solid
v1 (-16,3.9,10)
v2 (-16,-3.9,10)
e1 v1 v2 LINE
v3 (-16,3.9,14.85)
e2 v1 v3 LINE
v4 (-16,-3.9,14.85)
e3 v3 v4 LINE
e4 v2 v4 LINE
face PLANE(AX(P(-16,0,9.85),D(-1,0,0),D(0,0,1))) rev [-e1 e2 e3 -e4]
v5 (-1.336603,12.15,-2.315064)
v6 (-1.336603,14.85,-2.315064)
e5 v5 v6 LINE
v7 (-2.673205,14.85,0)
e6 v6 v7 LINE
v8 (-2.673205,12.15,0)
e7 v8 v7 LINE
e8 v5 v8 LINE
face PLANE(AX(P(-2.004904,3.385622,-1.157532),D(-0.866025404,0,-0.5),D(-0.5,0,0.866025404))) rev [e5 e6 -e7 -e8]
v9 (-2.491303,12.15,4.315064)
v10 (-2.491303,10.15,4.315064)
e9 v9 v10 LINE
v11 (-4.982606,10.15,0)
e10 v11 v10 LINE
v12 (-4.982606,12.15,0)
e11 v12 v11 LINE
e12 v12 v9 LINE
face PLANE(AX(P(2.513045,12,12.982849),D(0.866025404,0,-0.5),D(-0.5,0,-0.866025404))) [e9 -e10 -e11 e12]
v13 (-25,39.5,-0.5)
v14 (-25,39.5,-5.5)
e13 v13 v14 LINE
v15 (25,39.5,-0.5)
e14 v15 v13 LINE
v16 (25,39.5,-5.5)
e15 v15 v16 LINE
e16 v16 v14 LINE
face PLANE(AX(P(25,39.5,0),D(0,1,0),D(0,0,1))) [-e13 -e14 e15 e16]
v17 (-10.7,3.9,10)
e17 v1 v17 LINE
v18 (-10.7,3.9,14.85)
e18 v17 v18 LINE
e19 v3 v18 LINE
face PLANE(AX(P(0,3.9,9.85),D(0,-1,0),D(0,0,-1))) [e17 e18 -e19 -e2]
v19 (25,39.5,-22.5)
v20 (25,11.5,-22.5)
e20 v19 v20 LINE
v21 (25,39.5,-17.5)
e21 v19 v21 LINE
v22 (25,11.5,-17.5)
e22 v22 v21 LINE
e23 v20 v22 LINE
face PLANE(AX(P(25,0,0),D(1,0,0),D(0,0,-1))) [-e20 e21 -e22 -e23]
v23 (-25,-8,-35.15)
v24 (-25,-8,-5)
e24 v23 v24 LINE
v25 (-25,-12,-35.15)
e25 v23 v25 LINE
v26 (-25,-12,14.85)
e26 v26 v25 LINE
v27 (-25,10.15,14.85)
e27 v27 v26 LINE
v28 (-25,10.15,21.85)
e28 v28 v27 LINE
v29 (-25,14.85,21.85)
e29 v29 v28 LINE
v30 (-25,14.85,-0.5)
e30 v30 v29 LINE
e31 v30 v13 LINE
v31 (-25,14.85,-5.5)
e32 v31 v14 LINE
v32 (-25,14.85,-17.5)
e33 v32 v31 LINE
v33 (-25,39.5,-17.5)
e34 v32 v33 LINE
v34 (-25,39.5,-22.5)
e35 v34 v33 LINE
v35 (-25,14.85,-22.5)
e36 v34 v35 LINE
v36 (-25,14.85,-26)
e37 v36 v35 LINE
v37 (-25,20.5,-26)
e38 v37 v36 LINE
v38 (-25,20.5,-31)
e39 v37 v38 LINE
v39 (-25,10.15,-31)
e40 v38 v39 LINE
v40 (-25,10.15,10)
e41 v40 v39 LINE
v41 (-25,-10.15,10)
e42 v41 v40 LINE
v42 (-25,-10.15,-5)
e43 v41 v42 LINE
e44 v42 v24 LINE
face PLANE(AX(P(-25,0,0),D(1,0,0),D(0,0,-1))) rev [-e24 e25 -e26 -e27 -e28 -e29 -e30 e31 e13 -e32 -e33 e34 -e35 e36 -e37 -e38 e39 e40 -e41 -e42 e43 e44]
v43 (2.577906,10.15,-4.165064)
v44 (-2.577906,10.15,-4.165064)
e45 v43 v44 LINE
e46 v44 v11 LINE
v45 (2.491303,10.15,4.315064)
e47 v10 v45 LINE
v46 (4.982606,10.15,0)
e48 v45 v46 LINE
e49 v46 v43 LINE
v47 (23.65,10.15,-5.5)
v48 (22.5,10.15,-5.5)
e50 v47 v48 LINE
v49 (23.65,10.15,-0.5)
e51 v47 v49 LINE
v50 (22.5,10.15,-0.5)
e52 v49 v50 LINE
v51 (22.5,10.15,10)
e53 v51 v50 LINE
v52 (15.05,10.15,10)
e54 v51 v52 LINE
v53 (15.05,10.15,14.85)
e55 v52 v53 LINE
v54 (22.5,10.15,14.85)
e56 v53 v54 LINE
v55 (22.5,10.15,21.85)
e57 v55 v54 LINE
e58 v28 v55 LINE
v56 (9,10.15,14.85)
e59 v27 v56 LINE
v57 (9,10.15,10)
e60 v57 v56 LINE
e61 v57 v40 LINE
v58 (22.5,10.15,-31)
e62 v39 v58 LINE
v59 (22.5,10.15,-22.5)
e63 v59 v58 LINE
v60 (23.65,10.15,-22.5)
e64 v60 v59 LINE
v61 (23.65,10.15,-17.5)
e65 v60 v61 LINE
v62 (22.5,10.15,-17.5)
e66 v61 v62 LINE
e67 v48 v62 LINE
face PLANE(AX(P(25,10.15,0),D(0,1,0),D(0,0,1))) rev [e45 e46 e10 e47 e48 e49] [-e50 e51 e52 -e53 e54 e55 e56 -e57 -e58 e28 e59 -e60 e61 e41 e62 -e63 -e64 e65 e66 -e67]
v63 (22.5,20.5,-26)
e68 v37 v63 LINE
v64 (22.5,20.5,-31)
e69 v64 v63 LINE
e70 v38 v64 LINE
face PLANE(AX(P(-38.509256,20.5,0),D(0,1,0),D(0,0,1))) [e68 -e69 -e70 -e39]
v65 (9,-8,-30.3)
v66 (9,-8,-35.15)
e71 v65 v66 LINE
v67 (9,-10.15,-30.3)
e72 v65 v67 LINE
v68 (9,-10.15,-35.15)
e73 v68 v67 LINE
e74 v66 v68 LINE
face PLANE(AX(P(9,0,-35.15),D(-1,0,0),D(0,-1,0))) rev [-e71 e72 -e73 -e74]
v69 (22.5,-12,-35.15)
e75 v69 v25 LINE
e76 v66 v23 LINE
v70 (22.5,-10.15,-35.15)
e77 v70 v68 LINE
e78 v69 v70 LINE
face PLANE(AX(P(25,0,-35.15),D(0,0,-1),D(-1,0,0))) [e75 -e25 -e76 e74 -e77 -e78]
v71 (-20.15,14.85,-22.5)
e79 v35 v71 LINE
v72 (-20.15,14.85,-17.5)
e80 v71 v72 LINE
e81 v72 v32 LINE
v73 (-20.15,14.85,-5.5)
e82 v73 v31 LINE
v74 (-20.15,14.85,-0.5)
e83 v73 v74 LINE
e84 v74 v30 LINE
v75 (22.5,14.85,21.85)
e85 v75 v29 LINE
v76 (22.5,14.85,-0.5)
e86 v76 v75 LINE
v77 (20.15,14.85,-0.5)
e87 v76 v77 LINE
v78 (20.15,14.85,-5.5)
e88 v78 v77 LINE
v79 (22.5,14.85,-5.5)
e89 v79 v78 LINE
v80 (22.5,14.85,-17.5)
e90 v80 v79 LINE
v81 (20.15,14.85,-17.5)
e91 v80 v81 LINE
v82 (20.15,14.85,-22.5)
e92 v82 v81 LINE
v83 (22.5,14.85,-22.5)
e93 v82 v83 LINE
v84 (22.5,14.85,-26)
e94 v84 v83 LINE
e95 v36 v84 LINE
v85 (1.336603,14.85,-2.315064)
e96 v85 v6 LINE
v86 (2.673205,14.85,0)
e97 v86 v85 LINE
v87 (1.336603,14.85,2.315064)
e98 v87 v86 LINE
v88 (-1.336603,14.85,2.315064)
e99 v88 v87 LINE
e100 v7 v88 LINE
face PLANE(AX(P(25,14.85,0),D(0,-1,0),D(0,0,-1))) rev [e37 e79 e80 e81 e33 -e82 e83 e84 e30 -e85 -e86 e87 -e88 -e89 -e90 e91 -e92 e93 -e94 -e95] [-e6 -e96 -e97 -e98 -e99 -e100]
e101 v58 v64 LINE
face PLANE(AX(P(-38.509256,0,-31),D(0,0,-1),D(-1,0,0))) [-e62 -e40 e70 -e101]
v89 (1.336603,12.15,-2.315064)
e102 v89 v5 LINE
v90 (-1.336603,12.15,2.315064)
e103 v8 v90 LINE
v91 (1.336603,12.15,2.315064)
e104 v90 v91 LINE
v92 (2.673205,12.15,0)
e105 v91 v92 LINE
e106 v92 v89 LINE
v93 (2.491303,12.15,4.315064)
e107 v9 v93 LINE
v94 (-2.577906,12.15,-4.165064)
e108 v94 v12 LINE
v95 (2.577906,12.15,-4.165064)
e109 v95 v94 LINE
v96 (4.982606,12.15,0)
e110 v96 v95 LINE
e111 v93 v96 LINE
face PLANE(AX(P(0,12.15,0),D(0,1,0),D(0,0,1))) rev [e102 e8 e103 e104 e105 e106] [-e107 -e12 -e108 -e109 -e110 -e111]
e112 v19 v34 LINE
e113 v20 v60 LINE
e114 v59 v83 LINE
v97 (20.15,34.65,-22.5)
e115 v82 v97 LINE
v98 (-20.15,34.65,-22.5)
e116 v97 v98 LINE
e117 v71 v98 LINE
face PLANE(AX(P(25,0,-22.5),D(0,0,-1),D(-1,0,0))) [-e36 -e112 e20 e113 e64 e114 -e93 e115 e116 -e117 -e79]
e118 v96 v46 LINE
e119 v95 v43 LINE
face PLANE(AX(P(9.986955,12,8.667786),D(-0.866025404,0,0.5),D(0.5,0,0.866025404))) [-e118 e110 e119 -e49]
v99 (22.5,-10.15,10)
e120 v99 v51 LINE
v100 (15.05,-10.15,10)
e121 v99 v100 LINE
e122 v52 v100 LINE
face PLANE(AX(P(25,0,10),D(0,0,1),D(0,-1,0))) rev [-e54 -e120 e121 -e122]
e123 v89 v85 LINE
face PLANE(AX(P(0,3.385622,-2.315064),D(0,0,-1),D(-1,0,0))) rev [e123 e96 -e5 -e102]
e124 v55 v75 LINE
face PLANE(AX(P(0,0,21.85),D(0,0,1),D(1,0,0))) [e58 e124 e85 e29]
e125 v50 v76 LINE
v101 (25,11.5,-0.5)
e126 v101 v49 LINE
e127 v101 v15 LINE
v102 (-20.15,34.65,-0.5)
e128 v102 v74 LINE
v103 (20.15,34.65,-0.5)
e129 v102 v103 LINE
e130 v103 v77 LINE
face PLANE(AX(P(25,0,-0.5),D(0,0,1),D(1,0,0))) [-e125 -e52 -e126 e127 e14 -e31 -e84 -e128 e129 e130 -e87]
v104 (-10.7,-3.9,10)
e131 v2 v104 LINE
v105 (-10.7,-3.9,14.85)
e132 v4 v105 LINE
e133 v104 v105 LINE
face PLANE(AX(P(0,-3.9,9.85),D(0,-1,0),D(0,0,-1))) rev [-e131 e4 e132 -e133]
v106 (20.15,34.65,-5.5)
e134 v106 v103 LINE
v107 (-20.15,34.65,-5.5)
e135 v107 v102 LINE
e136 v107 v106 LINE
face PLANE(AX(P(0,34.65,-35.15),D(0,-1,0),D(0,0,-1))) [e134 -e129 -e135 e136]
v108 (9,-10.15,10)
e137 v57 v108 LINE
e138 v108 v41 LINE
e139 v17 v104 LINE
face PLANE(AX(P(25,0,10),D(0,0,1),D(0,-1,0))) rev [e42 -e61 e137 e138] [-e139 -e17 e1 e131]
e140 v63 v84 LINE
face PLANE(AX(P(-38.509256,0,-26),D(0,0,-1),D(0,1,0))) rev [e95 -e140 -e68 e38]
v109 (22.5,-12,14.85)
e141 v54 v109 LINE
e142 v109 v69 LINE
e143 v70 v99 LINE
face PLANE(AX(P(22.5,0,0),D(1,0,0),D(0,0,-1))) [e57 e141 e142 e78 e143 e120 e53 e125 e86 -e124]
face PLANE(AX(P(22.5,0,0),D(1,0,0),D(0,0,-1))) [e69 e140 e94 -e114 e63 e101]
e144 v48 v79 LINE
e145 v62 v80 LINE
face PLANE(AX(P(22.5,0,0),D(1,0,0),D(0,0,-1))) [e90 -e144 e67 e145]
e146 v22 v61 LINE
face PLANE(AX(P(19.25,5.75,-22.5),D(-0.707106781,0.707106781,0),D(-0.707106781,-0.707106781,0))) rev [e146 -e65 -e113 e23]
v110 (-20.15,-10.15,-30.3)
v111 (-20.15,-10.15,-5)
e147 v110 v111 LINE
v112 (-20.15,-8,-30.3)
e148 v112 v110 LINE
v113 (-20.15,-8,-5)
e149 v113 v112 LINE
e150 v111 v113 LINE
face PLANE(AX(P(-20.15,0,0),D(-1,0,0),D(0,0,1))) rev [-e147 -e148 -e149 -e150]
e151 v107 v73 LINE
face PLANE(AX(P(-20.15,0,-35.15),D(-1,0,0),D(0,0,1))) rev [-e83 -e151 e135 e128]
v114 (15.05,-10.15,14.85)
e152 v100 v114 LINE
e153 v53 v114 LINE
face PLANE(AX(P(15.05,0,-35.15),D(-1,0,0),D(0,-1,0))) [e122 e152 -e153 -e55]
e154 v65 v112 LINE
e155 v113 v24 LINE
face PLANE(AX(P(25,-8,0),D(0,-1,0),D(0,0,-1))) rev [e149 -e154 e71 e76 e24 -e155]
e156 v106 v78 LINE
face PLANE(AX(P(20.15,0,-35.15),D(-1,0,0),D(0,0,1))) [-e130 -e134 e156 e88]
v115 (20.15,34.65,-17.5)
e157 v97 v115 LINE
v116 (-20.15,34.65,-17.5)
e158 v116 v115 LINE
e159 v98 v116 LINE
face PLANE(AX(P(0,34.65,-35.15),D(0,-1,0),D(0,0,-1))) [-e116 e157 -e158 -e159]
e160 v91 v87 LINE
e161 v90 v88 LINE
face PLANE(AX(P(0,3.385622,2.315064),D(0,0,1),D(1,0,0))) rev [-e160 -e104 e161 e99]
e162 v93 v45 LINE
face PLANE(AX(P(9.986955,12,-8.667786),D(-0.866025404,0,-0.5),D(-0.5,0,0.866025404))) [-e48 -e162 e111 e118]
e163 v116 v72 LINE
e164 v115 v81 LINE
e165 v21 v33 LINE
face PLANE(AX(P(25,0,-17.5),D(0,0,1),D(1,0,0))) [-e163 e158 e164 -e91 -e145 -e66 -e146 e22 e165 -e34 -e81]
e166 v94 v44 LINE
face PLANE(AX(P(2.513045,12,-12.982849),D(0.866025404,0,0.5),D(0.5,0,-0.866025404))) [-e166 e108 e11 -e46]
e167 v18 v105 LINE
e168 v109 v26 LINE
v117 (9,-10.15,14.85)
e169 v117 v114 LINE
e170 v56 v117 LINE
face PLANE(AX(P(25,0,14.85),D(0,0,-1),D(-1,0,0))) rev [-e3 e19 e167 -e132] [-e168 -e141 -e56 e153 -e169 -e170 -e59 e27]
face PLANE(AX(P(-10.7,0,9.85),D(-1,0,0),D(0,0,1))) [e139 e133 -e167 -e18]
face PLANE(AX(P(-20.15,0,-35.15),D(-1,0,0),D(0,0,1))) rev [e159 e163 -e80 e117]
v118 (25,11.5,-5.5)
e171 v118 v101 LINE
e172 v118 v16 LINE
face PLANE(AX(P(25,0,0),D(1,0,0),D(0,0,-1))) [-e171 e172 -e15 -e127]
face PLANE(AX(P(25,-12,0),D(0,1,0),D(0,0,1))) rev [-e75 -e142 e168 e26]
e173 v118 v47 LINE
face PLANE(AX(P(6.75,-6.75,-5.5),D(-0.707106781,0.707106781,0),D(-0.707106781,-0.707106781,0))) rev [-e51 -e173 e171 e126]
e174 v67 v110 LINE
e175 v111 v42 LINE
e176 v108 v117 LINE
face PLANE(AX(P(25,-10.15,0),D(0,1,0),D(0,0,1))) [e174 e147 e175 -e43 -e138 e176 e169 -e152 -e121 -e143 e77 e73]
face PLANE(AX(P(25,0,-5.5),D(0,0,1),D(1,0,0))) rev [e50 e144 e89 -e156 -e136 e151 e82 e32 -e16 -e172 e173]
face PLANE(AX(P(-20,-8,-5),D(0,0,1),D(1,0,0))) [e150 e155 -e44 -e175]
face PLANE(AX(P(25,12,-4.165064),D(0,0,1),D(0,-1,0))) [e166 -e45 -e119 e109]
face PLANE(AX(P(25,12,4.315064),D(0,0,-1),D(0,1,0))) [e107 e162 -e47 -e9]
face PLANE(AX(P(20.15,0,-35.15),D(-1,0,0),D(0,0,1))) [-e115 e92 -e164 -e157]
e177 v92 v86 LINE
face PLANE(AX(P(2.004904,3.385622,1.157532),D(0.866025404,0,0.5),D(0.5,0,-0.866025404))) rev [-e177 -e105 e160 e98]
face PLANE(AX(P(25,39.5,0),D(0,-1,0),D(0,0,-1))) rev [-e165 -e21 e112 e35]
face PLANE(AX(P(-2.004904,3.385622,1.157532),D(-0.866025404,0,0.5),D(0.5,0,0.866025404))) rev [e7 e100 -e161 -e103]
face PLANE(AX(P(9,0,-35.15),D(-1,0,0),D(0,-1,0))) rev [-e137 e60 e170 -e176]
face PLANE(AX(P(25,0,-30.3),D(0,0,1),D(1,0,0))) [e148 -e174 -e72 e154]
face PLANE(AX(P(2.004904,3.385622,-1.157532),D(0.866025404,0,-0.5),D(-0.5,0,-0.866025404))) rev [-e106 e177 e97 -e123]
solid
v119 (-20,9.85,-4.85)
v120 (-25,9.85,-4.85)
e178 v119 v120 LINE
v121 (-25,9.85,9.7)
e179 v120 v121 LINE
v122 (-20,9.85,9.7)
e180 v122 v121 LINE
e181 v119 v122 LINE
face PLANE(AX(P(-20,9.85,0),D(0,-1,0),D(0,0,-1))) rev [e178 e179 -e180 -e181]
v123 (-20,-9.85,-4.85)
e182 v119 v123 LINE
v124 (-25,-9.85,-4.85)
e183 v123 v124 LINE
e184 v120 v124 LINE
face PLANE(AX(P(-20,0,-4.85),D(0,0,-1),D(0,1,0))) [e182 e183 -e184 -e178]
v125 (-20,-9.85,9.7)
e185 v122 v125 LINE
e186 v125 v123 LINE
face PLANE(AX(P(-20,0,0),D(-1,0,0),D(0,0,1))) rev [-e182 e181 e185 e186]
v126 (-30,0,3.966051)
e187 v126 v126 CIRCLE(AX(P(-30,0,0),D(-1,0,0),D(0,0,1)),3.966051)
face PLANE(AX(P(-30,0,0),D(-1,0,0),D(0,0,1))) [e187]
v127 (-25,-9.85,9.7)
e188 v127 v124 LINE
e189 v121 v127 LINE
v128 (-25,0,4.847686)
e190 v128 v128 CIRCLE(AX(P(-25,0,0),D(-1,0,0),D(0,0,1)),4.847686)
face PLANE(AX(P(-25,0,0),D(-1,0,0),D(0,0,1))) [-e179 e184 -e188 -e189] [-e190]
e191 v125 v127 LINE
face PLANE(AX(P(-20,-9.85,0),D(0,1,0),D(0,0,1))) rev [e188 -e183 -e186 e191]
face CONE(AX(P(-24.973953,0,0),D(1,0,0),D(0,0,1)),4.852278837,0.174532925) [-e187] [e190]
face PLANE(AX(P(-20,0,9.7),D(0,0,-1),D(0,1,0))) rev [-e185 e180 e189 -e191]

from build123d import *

# Parameters (mm, degrees)
MAIN_BODY_EXTRUDE_DEPTH            = 25
SKETCH2_W                          = 40
SKETCH2_H                          = 19.5
SKETCH2_W_2                        = 5.75
SKETCH2_H_2                        = 20
CUT_OUT_FOR_SERVO_AND_CAMERA_DEPTH = 69.448886039
CUT_EXTRUDE2_DEPTH                 = 5
CUT_EXTRUDE3_START                 = -5
CUT_EXTRUDE3_DEPTH                 = 2
MOVE_FACE1_BY                      = 2
SKETCH6_W                          = 5
SKETCH6_H                          = 7.5
CABLE_CLEARANCE_DEPTH              = 5
SKETCH7_W                          = 5
SKETCH7_H                          = 5.5
BOSS_EXTRUDE1_DEPTH                = 50
SKETCH8_R                          = 5
BOSS_EXTRUDE2_DEPTH                = 5
SKETCH8_3_R                        = 5
BOSS_EXTRUDE3_DEPTH                = 5
BOSS_EXTRUDE3_TAPER                = 10
SKETCH9_W                          = 25.15
SKETCH9_H                          = 2
BOSS_EXTRUDE4_DEPTH                = 5
INSET_THE_WALL_DEPTH               = 2.5
FRAME_CHAMFER_1_DEPTH              = 5
FRAME_START                        = -17
FRAME_CHAMFER_2_DEPTH              = 5
SKETCH12_W                         = 47.5
SKETCH12_H                         = 5
BOSS_EXTRUDE7_DEPTH                = 7
OFFSET_START                       = -5
OFFSET_FOR_3D_PRINT_OUTLINE_W      = 13
OFFSET_FOR_3D_PRINT_OUTLINE_H      = 0.15
OFFSET_FOR_3D_PRINT_DEPTH          = 14.85
OFFSET_FOR_3D_PRINT_2_OUTLINE_W    = 13
OFFSET_FOR_3D_PRINT_2_OUTLINE_H    = 19.7
OFFSET_FOR_3D_PRINT_2_DEPTH        = 0.15
OFFSET_START_2                     = 9.7
OFFSET_FOR_3D_PRINT_3_OUTLINE_W    = 13
OFFSET_FOR_3D_PRINT_3_OUTLINE_H    = 19.7
OFFSET_FOR_3D_PRINT_3_DEPTH        = 0.15
OFFSET_START_3                     = -10.15
OFFSET_FOR_3D_PRINT_5_DEPTH        = 20.3
OFFSET_START_4                     = 14.85
OFFSET_FOR_3D_PRINT_6_DEPTH        = 19.8
OFFSET_START_5                     = 10
OFFSET_FOR_3D_PRINT_7_DEPTH        = 0.15
OFFSET_START_6                     = -3.9
OFFSET_FOR_3D_PRINT_8_OUTLINE_W    = 5.3
OFFSET_FOR_3D_PRINT_8_OUTLINE_H    = 4.85
OFFSET_FOR_3D_PRINT_8_DEPTH        = 7.8
OFFSET_START_7                     = 10.15
OFFSET_FOR_3D_PRINT_9_DEPTH        = 2
OFFSET_START_8                     = 12.15
OFFSET_FOR_3D_PRINT_10_DEPTH       = 2.7


with BuildPart() as part:
    # Sketch1 → Main Body Extrude (new, symmetric)
    with BuildSketch(Plane(origin=(0, 0, 0), x_dir=(0, 0, -1), z_dir=(1, 0, 0))):
        Polygon((-14.85, -12), (35.15, -12), (35.15, -8), (30.15, -8), (30.15, -10), (-9.85, -10), (-9.85, 10), (22.5, 10), (22.5, 39.5), (17.5, 39.5), (17.5, 15), (5.5, 15), (5.5, 39.5), (0.5, 39.5), (0.5, 15), (-14.85, 15), align=None)
    extrude(amount=MAIN_BODY_EXTRUDE_DEPTH, both=True)

    # Sketch2 → Cut out for Servo and camera (cut, through all)
    with BuildSketch(Plane.XY.offset(14.85)):
        with Locations((0, 24.75)):
            Rectangle(SKETCH2_W, SKETCH2_H)
        with Locations((12.025, 0)):
            Rectangle(SKETCH2_W_2, SKETCH2_H_2)
    extrude(amount=-CUT_OUT_FOR_SERVO_AND_CAMERA_DEPTH, mode=Mode.SUBTRACT)

    # Sketch3 → Cut-Extrude2 (cut)
    with BuildSketch(Plane(origin=(0, 15, 0), x_dir=(1, 0, 0), z_dir=(0, 1, 0))):
        Polygon((2.5, 0), (1.25, 2.165063509), (-1.25, 2.165063509), (-2.5, 0), (-1.25, -2.165063509), (1.25, -2.165063509), align=None)
    extrude(amount=-CUT_EXTRUDE2_DEPTH, mode=Mode.SUBTRACT)

    # Sketch3<3> → Cut-Extrude3 (cut)
    with BuildSketch(Plane(origin=(0, 15, 0), x_dir=(1, 0, 0), z_dir=(0, 1, 0)).offset(CUT_EXTRUDE3_START)):
        Polygon((4.809401077, 0), (2.404700538, 4.165063509), (-2.404700538, 4.165063509), (-4.809401077, 0), (-2.404700538, -4.165063509), (2.404700538, -4.165063509), align=None)
    extrude(amount=CUT_EXTRUDE3_DEPTH, mode=Mode.SUBTRACT)

    # Move Face1: a face moved inward by 2.0
    extrude(part.faces().sort_by_distance((19.95, -8, -32.65))[0], amount=MOVE_FACE1_BY, dir=(0, -1, 0), mode=Mode.SUBTRACT)

    # Sketch6 → Cable Clearance (cut)
    with BuildSketch(Plane.XY.offset(14.85)):
        with Locations((-13.35, 0)):
            Rectangle(SKETCH6_W, SKETCH6_H)
    extrude(amount=-CABLE_CLEARANCE_DEPTH, mode=Mode.SUBTRACT)

    # Sketch7 → Boss-Extrude1 (add)
    with BuildSketch(Plane(origin=(25, 0, 0), x_dir=(0, 0, -1), z_dir=(1, 0, 0))):
        Polygon((22.5, 15), (22.5, 10), (31, 10), (31, 15), (26, 15), align=None)
        with Locations((28.5, 17.75)):
            Rectangle(SKETCH7_W, SKETCH7_H)
    extrude(amount=-BOSS_EXTRUDE1_DEPTH)

    # Sketch9 → Boss-Extrude4 (add)
    with BuildSketch(Plane.ZY.offset(25)):
        with Locations((-17.575, -9)):
            Rectangle(SKETCH9_W, SKETCH9_H)
    extrude(amount=-BOSS_EXTRUDE4_DEPTH)

    # Sketch10 → Inset the wall (cut)
    with BuildSketch(Plane(origin=(25, 0, 0), x_dir=(0, 0, -1), z_dir=(1, 0, 0))):
        Polygon((0.5, 15), (5.5, 15), (17.5, 15), (22.5, 15), (26, 15), (26, 20.5), (31, 20.5), (31, 10), (-9.85, 10), (-9.85, -10), (35.15, -10), (35.15, -12), (-14.85, -12), (-14.85, 15), align=None)
    extrude(amount=-INSET_THE_WALL_DEPTH, mode=Mode.SUBTRACT)

    # Sketch11 → Frame Chamfer 1 (add)
    with BuildSketch(Plane.XY.offset(-0.5)):
        Polygon((25, 11.5), (25, 15), (22.5, 15), (22.5, 10), (23.5, 10), align=None)
    extrude(amount=-FRAME_CHAMFER_1_DEPTH)

    # Sketch11<3> → Frame Chamfer 2 (add)
    with BuildSketch(Plane.XY.offset(-0.5).offset(FRAME_START)):
        Polygon((25, 11.5), (25, 15), (22.5, 15), (22.5, 10), (23.5, 10), align=None)
    extrude(amount=-FRAME_CHAMFER_2_DEPTH)

    # Sketch12 → Boss-Extrude7 (add)
    with BuildSketch(Plane.XY.offset(14.85)):
        with Locations((-1.25, 12.5)):
            Rectangle(SKETCH12_W, SKETCH12_H)
    extrude(amount=BOSS_EXTRUDE7_DEPTH)

    # Offset for 3D print 5 outline → Offset for 3D print 5 (cut)
    with BuildSketch(Plane(origin=(0, 0, 0), x_dir=(1, 0, 0), z_dir=(0, 1, 0)).offset(OFFSET_START_3)):
        Polygon((22.5, 0.5), (23.65, 0.5), (23.65, 5.5), (22.5, 5.5), (22.5, 17.5), (23.65, 17.5), (23.65, 22.5), (22.5, 22.5), (22.5, 35.15), (9, 35.15), (9, 30.3), (-20.15, 30.3), (-20.15, 5), (-25, 5), (-25, -10), (9, -10), (9, -14.85), (-25, -14.85), (-25, -21.85), (22.5, -21.85), (22.5, -14.85), (15.05, -14.85), (15.05, -10), (22.5, -10), align=None)
    extrude(amount=OFFSET_FOR_3D_PRINT_5_DEPTH, mode=Mode.SUBTRACT)

    # Offset for 3D print 6 outline → Offset for 3D print 6 (cut)
    with BuildSketch(Plane(origin=(0, 0, 0), x_dir=(1, 0, 0), z_dir=(0, 1, 0)).offset(OFFSET_START_4)):
        Polygon((-20.15, 0.5), (-25, 0.5), (-25, -21.85), (22.5, -21.85), (22.5, 0.5), (20.15, 0.5), (20.15, 5.5), (22.5, 5.5), (22.5, 17.5), (20.15, 17.5), (20.15, 22.5), (22.5, 22.5), (22.5, 26), (-25, 26), (-25, 22.5), (-20.15, 22.5), (-20.15, 17.5), (-25, 17.5), (-25, 5.5), (-20.15, 5.5), align=None)
        Polygon((-2.5, 0), (-2.211324865, 0.5), (2.211324865, 0.5), (2.5, 0), (1.25, -2.165063509), (-1.25, -2.165063509), align=None, mode=Mode.SUBTRACT)
    extrude(amount=OFFSET_FOR_3D_PRINT_6_DEPTH, mode=Mode.SUBTRACT)

    # Offset for 3D print 7 outline → Offset for 3D print 7 (cut)
    with BuildSketch(Plane(origin=(0, 0, 0), x_dir=(1, 0, 0), z_dir=(0, 1, 0)).offset(OFFSET_START_5)):
        Polygon((-25, 5), (-20.15, 5), (-20.15, 30.3), (9, 30.3), (9, 31), (-25, 31), align=None)
    extrude(amount=OFFSET_FOR_3D_PRINT_7_DEPTH, mode=Mode.SUBTRACT)

    # Offset for 3D print 8 outline → Offset for 3D print 8 (cut)
    with BuildSketch(Plane(origin=(0, 0, 0), x_dir=(1, 0, 0), z_dir=(0, 1, 0)).offset(OFFSET_START_6)):
        with Locations((-13.35, -12.425)):
            Rectangle(OFFSET_FOR_3D_PRINT_8_OUTLINE_W, OFFSET_FOR_3D_PRINT_8_OUTLINE_H)
    extrude(amount=OFFSET_FOR_3D_PRINT_8_DEPTH, mode=Mode.SUBTRACT)

    # Offset for 3D print 9 outline → Offset for 3D print 9 (cut)
    with BuildSketch(Plane(origin=(0, 0, 0), x_dir=(1, 0, 0), z_dir=(0, 1, 0)).offset(OFFSET_START_7)):
        Polygon((-4.982606158, 0), (-2.491303079, -4.315063509), (2.491303079, -4.315063509), (4.982606158, 0), (2.577905619, 4.165063509), (-2.577905619, 4.165063509), align=None)
        Polygon((-2.5, 0), (-1.25, 2.165063509), (1.25, 2.165063509), (2.5, 0), (1.25, -2.165063509), (-1.25, -2.165063509), align=None, mode=Mode.SUBTRACT)
    extrude(amount=OFFSET_FOR_3D_PRINT_9_DEPTH, mode=Mode.SUBTRACT)

    # Offset for 3D print 10 outline → Offset for 3D print 10 (cut)
    with BuildSketch(Plane(origin=(0, 0, 0), x_dir=(1, 0, 0), z_dir=(0, 1, 0)).offset(OFFSET_START_8)):
        Polygon((2.673205081, 0), (1.33660254, 2.315063509), (-1.33660254, 2.315063509), (-2.673205081, 0), (-1.33660254, -2.315063509), (1.33660254, -2.315063509), align=None)
        Polygon((-2.5, 0), (-1.25, 2.165063509), (1.25, 2.165063509), (2.5, 0), (1.25, -2.165063509), (-1.25, -2.165063509), align=None, mode=Mode.SUBTRACT)
    extrude(amount=OFFSET_FOR_3D_PRINT_10_DEPTH, mode=Mode.SUBTRACT)


with BuildPart() as body_2:
    # Sketch8 → Boss-Extrude2 (new body)
    # profile 1 of 2: a face of its own
    with BuildSketch(Plane.ZY.offset(25)):
        Polygon((9.85, -10), (9.85, 10), (-5, 10), (-5, 7e-09), (-5, -10), align=None)
        with BuildLine():
            ThreePointArc((5, 0), (-4e-09, -5), (-5, 7e-09))
            ThreePointArc((-5, 7e-09), (4e-09, 5), (5, 0))
        make_face(mode=Mode.SUBTRACT)
    # profile 2 of 2: a face of its own
    with BuildSketch(Plane.ZY.offset(25)):
        Circle(SKETCH8_R)
    extrude(amount=-BOSS_EXTRUDE2_DEPTH)

    # Sketch8<3> → Boss-Extrude3 (add)
    with BuildSketch(Plane.ZY.offset(25)):
        Circle(SKETCH8_3_R)
    extrude(amount=BOSS_EXTRUDE3_DEPTH, taper=BOSS_EXTRUDE3_TAPER)

    # Offset for 3D print: read off the stored shape, not the designer's step
    # Offset for 3D print outline → Offset for 3D print (cut)
    with BuildSketch(Plane.XY.offset(OFFSET_START)):
        with Locations((-25.5, 9.925)):
            Rectangle(OFFSET_FOR_3D_PRINT_OUTLINE_W, OFFSET_FOR_3D_PRINT_OUTLINE_H)
        with Locations((-25.5, -9.925)):
            Rectangle(OFFSET_FOR_3D_PRINT_OUTLINE_W, OFFSET_FOR_3D_PRINT_OUTLINE_H)
    extrude(amount=OFFSET_FOR_3D_PRINT_DEPTH, mode=Mode.SUBTRACT)

    # Offset for 3D print 2 outline → Offset for 3D print 2 (cut)
    with BuildSketch(Plane.XY.offset(OFFSET_START)):
        with Locations((-25.5, 0)):
            Rectangle(OFFSET_FOR_3D_PRINT_2_OUTLINE_W, OFFSET_FOR_3D_PRINT_2_OUTLINE_H)
    extrude(amount=OFFSET_FOR_3D_PRINT_2_DEPTH, mode=Mode.SUBTRACT)

    # Offset for 3D print 3 outline → Offset for 3D print 3 (cut)
    with BuildSketch(Plane.XY.offset(OFFSET_START_2)):
        with Locations((-25.5, 0)):
            Rectangle(OFFSET_FOR_3D_PRINT_3_OUTLINE_W, OFFSET_FOR_3D_PRINT_3_OUTLINE_H)
    extrude(amount=OFFSET_FOR_3D_PRINT_3_DEPTH, mode=Mode.SUBTRACT)

    # Offset for 3D print 4 outline → Offset for 3D print 4 (revolve, cut)
    with BuildSketch(Plane.YX):
        Polygon((3.966051105, -30), (4.118365096, -30), (5, -25), (4.847686008, -25), align=None)
    revolve(axis=Axis((0, 0, 0), (1, 0, 0)), mode=Mode.SUBTRACT)


solid = Compound([part.part, body_2.part])
